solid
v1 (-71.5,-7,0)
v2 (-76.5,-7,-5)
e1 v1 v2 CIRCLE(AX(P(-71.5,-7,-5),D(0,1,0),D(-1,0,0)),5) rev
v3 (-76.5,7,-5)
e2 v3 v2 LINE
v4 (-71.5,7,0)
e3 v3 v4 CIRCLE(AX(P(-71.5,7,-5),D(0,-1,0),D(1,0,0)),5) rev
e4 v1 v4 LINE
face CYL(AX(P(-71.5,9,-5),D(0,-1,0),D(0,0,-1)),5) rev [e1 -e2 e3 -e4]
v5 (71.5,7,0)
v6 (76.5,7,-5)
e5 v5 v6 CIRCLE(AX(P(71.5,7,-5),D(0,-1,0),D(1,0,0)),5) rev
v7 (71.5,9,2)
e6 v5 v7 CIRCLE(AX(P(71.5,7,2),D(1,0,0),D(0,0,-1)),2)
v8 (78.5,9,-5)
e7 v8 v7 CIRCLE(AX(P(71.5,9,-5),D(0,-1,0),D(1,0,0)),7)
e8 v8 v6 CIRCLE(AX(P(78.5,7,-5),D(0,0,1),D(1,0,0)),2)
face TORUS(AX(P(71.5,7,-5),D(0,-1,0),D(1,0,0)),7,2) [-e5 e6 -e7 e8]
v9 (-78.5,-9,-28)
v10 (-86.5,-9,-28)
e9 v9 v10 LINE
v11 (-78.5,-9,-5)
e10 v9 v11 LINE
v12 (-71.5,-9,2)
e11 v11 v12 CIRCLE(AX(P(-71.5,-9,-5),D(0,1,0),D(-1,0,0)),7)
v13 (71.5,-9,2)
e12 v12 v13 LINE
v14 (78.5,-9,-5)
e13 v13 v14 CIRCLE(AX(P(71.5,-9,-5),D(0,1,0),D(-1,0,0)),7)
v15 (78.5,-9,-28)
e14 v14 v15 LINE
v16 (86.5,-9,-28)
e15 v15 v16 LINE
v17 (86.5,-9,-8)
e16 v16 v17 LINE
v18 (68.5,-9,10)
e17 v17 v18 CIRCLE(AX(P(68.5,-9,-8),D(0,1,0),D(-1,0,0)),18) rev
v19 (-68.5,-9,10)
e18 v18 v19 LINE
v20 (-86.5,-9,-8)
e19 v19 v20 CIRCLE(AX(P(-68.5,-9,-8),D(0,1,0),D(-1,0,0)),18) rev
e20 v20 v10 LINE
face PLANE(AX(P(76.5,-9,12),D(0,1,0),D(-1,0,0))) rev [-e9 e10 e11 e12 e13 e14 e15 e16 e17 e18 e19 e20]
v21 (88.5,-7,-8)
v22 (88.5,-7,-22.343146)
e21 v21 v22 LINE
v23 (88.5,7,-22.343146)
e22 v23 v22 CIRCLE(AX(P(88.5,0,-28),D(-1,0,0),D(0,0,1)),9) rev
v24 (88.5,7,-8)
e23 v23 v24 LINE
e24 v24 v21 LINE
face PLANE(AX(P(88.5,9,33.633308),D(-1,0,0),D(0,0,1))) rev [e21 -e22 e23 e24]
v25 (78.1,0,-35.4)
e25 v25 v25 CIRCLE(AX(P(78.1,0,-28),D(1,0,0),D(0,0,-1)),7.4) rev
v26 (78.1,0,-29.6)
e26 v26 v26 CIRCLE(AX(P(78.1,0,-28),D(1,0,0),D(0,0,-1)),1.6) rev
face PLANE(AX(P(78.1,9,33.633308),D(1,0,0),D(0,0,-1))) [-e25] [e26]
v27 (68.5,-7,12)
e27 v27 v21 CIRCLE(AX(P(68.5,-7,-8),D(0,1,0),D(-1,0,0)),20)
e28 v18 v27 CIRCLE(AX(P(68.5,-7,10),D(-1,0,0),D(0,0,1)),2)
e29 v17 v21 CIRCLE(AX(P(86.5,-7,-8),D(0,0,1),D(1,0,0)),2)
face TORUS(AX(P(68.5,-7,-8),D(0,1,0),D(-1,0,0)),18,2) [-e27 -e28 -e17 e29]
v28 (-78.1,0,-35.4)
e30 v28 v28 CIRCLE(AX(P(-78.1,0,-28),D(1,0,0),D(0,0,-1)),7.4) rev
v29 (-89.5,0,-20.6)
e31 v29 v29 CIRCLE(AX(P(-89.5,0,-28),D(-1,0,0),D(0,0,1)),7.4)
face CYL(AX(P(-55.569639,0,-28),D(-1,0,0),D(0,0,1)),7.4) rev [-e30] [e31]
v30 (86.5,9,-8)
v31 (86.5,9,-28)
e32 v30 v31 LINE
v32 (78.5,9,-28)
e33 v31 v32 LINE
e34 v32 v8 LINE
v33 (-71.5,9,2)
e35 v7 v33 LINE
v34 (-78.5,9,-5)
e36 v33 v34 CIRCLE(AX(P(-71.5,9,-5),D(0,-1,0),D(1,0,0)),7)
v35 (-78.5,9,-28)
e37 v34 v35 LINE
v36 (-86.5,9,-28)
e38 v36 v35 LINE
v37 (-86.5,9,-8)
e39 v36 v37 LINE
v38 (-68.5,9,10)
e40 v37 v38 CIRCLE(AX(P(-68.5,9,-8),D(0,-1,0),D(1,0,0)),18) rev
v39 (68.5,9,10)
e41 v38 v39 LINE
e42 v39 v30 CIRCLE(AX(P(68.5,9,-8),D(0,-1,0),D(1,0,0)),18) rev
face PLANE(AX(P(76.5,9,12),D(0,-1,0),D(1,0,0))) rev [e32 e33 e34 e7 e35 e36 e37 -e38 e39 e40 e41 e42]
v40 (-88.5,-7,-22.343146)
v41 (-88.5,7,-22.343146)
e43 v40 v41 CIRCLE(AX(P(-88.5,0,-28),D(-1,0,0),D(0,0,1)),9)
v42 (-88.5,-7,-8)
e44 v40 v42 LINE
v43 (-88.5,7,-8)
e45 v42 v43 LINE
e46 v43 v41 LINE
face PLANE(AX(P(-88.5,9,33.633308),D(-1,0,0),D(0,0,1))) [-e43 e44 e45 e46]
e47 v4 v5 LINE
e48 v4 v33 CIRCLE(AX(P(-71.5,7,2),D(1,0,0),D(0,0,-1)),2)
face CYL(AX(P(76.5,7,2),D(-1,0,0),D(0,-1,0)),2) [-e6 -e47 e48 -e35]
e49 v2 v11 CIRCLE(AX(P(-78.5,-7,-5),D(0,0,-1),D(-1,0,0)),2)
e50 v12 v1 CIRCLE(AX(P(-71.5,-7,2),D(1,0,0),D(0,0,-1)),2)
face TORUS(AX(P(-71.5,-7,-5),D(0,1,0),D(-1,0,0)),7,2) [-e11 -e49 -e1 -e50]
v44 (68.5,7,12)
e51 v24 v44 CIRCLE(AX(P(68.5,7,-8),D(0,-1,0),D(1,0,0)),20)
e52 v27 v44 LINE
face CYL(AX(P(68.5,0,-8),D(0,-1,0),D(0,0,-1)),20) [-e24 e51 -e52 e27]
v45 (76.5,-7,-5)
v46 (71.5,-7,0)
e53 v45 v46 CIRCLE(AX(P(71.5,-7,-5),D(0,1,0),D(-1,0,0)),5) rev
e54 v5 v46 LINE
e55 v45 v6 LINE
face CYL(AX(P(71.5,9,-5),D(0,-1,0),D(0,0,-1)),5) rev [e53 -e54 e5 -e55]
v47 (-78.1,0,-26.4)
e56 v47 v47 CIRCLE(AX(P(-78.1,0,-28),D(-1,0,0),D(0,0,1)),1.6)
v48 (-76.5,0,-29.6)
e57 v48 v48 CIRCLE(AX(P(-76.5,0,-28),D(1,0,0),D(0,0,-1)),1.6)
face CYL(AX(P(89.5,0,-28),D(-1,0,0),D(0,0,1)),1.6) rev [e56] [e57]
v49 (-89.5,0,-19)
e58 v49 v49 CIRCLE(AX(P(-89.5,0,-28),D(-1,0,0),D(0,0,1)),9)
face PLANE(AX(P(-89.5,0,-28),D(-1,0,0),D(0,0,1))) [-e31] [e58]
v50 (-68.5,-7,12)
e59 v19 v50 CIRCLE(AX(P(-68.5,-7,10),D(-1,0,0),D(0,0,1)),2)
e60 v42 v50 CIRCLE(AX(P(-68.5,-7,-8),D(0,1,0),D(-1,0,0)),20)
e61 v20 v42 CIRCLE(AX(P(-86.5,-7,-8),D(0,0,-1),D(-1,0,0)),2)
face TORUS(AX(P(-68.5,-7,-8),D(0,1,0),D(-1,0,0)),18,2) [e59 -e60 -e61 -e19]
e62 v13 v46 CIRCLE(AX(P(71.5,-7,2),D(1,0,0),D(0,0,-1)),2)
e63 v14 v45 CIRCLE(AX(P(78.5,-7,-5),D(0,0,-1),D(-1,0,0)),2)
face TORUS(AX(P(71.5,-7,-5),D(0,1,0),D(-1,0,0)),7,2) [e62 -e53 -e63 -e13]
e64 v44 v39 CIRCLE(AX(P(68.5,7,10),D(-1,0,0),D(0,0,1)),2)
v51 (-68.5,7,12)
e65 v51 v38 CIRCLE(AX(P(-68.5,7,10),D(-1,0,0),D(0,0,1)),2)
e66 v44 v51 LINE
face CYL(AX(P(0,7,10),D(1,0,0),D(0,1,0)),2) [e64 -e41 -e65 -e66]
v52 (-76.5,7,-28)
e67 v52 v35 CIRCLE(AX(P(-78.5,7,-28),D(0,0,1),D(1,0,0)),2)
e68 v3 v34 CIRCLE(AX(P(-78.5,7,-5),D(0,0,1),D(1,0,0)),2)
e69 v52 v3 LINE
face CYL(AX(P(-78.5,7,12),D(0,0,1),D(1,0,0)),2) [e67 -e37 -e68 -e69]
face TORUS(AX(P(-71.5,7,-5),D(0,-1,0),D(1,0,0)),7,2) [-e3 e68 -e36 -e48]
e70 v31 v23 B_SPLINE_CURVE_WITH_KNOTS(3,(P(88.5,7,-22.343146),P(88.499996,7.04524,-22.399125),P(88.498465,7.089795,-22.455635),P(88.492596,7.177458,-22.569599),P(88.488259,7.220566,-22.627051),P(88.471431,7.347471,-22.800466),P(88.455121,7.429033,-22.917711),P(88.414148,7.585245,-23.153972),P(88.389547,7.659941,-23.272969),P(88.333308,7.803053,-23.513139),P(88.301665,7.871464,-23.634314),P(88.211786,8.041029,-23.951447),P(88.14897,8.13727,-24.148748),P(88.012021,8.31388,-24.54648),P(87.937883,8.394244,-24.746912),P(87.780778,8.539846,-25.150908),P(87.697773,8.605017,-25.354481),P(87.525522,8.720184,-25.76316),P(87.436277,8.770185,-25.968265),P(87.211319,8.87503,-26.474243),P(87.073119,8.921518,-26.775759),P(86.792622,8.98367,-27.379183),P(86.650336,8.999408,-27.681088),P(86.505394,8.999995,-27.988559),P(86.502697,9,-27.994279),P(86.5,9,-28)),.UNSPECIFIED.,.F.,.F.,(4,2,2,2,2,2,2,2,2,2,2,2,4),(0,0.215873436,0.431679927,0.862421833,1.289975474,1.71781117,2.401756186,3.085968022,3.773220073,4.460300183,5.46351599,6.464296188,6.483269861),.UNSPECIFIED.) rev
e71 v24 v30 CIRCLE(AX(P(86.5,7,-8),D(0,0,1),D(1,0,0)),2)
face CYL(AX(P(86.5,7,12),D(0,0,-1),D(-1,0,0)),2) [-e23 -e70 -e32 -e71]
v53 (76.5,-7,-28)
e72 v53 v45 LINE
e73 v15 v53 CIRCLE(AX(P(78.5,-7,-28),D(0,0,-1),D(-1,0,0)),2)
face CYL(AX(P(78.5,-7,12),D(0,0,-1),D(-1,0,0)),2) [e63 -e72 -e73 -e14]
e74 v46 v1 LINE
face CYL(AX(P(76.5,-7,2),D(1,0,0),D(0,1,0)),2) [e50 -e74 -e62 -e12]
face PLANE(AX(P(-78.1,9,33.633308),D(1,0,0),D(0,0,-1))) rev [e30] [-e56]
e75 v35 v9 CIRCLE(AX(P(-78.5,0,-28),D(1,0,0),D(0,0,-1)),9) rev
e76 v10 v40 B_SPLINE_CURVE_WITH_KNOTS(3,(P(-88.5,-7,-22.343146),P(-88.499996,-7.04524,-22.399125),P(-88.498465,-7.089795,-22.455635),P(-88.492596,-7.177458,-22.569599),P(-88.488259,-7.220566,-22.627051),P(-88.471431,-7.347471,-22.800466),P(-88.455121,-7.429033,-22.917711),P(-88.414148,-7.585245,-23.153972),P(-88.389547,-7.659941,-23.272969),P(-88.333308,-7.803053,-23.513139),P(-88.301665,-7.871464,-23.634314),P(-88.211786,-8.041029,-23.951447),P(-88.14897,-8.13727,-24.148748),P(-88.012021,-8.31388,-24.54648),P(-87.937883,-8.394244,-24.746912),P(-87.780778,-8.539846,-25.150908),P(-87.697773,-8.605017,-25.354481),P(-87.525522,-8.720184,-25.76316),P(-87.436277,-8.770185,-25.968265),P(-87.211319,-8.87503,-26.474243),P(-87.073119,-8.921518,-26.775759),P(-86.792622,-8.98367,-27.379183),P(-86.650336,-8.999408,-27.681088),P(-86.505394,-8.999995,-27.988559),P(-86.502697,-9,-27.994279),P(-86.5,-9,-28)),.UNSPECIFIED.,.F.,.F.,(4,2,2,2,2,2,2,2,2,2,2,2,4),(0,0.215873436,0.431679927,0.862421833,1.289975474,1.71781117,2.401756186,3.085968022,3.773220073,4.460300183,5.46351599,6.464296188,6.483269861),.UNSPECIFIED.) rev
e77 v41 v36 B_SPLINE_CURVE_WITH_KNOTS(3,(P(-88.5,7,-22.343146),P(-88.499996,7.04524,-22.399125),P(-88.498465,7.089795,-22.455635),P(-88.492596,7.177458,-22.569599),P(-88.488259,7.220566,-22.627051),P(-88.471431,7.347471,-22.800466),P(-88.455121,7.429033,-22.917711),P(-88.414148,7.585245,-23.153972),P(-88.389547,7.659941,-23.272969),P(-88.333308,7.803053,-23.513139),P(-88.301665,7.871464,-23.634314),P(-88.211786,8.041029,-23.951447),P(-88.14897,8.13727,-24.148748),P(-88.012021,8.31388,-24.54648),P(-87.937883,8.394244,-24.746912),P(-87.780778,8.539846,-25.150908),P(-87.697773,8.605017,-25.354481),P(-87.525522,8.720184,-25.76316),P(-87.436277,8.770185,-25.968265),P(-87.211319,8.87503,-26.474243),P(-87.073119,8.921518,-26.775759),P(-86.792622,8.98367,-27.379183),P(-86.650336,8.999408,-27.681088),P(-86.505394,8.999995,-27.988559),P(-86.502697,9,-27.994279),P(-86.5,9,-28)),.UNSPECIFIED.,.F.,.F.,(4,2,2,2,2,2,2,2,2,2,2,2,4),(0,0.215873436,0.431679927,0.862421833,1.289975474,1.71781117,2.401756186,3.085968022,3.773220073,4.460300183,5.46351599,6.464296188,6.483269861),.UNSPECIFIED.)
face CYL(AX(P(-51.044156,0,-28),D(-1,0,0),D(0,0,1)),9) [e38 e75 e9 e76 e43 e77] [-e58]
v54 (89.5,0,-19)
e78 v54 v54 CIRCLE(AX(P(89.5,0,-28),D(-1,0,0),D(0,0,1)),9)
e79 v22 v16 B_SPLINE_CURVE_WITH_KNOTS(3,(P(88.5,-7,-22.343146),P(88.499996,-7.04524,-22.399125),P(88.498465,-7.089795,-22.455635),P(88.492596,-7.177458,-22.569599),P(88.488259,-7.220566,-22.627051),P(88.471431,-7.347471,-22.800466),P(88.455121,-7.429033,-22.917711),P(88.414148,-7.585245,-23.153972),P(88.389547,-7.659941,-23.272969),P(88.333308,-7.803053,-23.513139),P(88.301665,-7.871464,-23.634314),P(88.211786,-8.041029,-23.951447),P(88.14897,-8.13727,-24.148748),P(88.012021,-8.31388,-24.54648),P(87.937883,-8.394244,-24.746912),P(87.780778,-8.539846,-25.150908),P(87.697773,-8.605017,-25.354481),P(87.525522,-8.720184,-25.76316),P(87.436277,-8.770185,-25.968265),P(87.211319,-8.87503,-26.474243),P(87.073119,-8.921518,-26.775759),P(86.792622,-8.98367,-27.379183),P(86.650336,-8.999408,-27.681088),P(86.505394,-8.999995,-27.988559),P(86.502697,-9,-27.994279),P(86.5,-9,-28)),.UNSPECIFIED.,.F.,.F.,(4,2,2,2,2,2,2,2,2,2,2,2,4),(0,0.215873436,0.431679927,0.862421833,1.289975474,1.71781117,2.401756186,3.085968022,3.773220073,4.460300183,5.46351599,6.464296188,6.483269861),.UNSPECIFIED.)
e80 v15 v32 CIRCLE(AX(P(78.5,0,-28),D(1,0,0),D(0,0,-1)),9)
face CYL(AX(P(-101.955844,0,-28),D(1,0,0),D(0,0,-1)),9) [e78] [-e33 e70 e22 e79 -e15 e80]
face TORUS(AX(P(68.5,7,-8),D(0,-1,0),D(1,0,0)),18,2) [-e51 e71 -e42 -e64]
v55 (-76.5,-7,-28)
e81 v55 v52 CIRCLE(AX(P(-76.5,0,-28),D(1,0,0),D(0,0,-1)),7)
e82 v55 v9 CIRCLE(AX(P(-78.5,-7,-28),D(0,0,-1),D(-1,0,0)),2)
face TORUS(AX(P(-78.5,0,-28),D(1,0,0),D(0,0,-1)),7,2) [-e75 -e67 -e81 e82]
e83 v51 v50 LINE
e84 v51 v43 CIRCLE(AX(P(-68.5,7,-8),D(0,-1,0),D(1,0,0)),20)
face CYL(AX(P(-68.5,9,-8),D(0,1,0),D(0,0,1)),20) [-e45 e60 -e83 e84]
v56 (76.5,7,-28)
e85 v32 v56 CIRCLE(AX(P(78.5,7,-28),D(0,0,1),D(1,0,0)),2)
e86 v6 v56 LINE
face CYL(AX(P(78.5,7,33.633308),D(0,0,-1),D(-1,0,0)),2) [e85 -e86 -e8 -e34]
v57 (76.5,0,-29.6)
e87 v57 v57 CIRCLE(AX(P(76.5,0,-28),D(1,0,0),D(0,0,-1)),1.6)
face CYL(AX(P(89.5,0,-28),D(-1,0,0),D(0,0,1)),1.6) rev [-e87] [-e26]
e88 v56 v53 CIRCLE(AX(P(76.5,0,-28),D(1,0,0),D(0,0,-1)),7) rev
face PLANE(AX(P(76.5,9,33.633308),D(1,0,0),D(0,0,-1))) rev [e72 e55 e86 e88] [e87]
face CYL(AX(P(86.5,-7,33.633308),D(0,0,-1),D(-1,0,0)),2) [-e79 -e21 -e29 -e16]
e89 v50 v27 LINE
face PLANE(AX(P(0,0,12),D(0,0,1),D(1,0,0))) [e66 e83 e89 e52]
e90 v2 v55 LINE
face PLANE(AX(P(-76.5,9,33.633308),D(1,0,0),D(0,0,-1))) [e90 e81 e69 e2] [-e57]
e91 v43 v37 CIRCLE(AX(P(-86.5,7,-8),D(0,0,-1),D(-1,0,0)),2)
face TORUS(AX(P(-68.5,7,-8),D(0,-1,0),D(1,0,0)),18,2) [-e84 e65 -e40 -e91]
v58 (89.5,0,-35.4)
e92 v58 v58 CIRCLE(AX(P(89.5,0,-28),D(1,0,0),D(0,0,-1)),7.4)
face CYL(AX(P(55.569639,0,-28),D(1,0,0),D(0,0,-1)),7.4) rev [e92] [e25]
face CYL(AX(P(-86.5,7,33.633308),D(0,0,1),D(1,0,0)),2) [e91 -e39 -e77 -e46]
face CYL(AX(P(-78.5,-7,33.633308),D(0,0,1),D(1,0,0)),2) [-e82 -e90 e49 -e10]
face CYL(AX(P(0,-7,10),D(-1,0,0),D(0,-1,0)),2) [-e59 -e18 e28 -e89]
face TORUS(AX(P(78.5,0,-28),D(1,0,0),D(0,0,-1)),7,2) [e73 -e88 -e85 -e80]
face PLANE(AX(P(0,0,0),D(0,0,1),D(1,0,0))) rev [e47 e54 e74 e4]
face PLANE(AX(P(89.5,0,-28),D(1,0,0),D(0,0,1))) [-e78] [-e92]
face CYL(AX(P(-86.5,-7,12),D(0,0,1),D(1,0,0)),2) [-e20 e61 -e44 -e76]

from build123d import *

# Parameters (mm, degrees)
SKETCH1_W           = 153
SKETCH1_H           = 18
BOSS_EXTRUDE1_DEPTH = 12
BOSS_EXTRUDE2_START = -12
SKETCH2_W           = 12
SKETCH2_H           = 18
BOSS_EXTRUDE2_DEPTH = 40
BOSS_EXTRUDE3_START = -12
SKETCH3_R           = 9
BOSS_EXTRUDE3_DEPTH = 13
SKETCH4_R           = 7.4
CUT_EXTRUDE1_DEPTH  = 11.4
SKETCH5_R           = 1.6
CUT_EXTRUDE2_DEPTH  = 172.871347234
CUT_EXTRUDE4_START  = -11.4
SKETCH9_R           = 7.4
CUT_EXTRUDE4_DEPTH  = 11.4
FILLET1_R           = 20
FILLET2_R           = 5
FILLET3_R           = 2


with BuildPart() as part:
    # Sketch1 → Boss-Extrude1 (new body)
    with BuildSketch(Plane.XY):
        Rectangle(SKETCH1_W, SKETCH1_H)
    extrude(amount=BOSS_EXTRUDE1_DEPTH)

    # Sketch2 → Boss-Extrude2 (add)
    with BuildSketch(Plane(origin=(0, 0, 0), x_dir=(-1, 0, 0), z_dir=(0, 0, -1)).offset(BOSS_EXTRUDE2_START)):
        with Locations((82.5, 0)):
            Rectangle(SKETCH2_W, SKETCH2_H)
    boss_extrude2 = extrude(amount=BOSS_EXTRUDE2_DEPTH)

    # Sketch3 → Boss-Extrude3 (add)
    with BuildSketch(Plane.ZY.offset(88.5).offset(BOSS_EXTRUDE3_START)):
        with Locations((-28, 0)):
            Circle(SKETCH3_R)
    boss_extrude3 = extrude(amount=BOSS_EXTRUDE3_DEPTH)

    # Mirror1: Boss-Extrude2, Boss-Extrude3 across plane
    add(boss_extrude2.mirror(Plane(origin=(0, 0, 0), x_dir=(0, 0, 1), z_dir=(1, 0, 0))))
    add(boss_extrude3.mirror(Plane(origin=(0, 0, 0), x_dir=(0, 0, 1), z_dir=(1, 0, 0))))

    # Sketch4 → Cut-Extrude1 (cut)
    with BuildSketch(Plane.ZY.offset(89.5)):
        with Locations((-28, 0)):
            Circle(SKETCH4_R)
    extrude(amount=-CUT_EXTRUDE1_DEPTH, mode=Mode.SUBTRACT)

    # Sketch5 → Cut-Extrude2 (cut, through all)
    with BuildSketch(Plane.ZY.offset(78.1)):
        with Locations((-28, 0)):
            Circle(SKETCH5_R)
    extrude(amount=-CUT_EXTRUDE2_DEPTH, mode=Mode.SUBTRACT)

    # Sketch9 → Cut-Extrude4 (cut)
    with BuildSketch(Plane(origin=(89.5, 0, 0), x_dir=(0, 0, -1), z_dir=(1, 0, 0)).offset(CUT_EXTRUDE4_START)):
        with Locations(Location((28, 0, 0), (0, 0, 180))):
            Circle(SKETCH9_R)
    extrude(amount=CUT_EXTRUDE4_DEPTH, mode=Mode.SUBTRACT)

    # Fillet1
    fillet1_edges = [part.edges().sort_by_distance(p)[0] for p in [
        (-88.5, 0, 12),
        (88.5, 0, 12),
    ]]
    fillet(fillet1_edges, radius=FILLET1_R)

    # Fillet2
    fillet2_edges = [part.edges().sort_by_distance(p)[0] for p in [
        (76.5, 0, 0),
        (-76.5, 0, 0),
    ]]
    fillet(fillet2_edges, radius=FILLET2_R)

    # Fillet3
    # the kernel refuses this fillet: 2 mm, written as the material it takes off along each edge
    with BuildSketch(Plane(origin=(-76.5, 0, -28), x_dir=(0, 1, 0), z_dir=(0, 0, 1))) as fillet3_piece_1:
        with BuildLine():
            CenterArc((9 - FILLET3_R, FILLET3_R), FILLET3_R, 270, 90)
            Line((9, FILLET3_R), (9, 0))
            Line((9, 0), (9 - FILLET3_R, 0))
        make_face()
    revolve(axis=Axis((-76.5, 0, -28), (-1, 0, 0)), revolution_arc=180, mode=Mode.SUBTRACT)
    with BuildSketch(Plane(origin=(76.5, 0, -28), x_dir=(0, 1, 0), z_dir=(0, 0, 1))) as fillet3_piece_2:
        with BuildLine():
            CenterArc((9 - FILLET3_R, -FILLET3_R), FILLET3_R, 0, 90)
            Line((9, -FILLET3_R), (9, 0))
            Line((9, 0), (9 - FILLET3_R, 0))
        make_face()
    revolve(axis=Axis((76.5, 0, -28), (-1, 0, 0)), revolution_arc=180, mode=Mode.SUBTRACT)
    with BuildSketch(Plane(origin=(68.5, 9, 12), x_dir=(0, -1, 0), z_dir=(-1, 0, 0)), Plane(origin=(68.5, -9, 12), x_dir=(0, 0, -1), z_dir=(-1, 0, 0))) as fillet3_piece_3:
        with BuildLine():
            CenterArc((FILLET3_R, -FILLET3_R), FILLET3_R, 90, 90)
            Line((0, -FILLET3_R), (0, 0))
            Line((0, 0), (FILLET3_R, 0))
        make_face()
    extrude(amount=137, mode=Mode.SUBTRACT)
    with BuildSketch(Plane(origin=(-88.5, 9, -8), x_dir=(0, -1, 0), z_dir=(0, 0, -1))) as fillet3_piece_4_section:
        with BuildLine():
            CenterArc((FILLET3_R, -FILLET3_R), FILLET3_R, 90, 90)
            Line((0, -FILLET3_R), (0, 0))
            Line((0, 0), (FILLET3_R, 0))
        make_face()
    fillet3_piece_4 = extrude(amount=25, mode=Mode.PRIVATE)
    fillet3_piece_4 = fillet3_piece_4 - Plane(origin=(-88.080537714, 0, -28), x_dir=(0, 0, 1), z_dir=(1, 0, 0)) * Cylinder(9, 59, mode=Mode.PRIVATE)
    add(fillet3_piece_4, mode=Mode.SUBTRACT)
    with BuildSketch(Plane(origin=(88.5, 9, -8), x_dir=(0, -1, 0), z_dir=(0, 0, -1))) as fillet3_piece_5_section:
        with BuildLine():
            CenterArc((FILLET3_R, FILLET3_R), FILLET3_R, 180, 90)
            Line((0, FILLET3_R), (0, 0))
            Line((0, 0), (FILLET3_R, 0))
        make_face()
    fillet3_piece_5 = extrude(amount=25, mode=Mode.PRIVATE)
    fillet3_piece_5 = fillet3_piece_5 - Plane(origin=(88.080537714, 0, -28), x_dir=(0, 0, 1), z_dir=(-1, 0, 0)) * Cylinder(9, 59, mode=Mode.PRIVATE)
    add(fillet3_piece_5, mode=Mode.SUBTRACT)
    with BuildSketch(Plane(origin=(-68.5, 9, -8), x_dir=(-1, 0, 0), z_dir=(0, 0, -1))) as fillet3_piece_6:
        with BuildLine():
            CenterArc((20 - FILLET3_R, -FILLET3_R), FILLET3_R, 0, 90)
            Line((20 - FILLET3_R, 0), (20, 0))
            Line((20, 0), (20, -FILLET3_R))
        make_face()
    revolve(axis=Axis((-68.5, 9, -8), (0, 1, 0)), revolution_arc=90, mode=Mode.SUBTRACT)
    with BuildSketch(Plane(origin=(68.5, 9, -8), x_dir=(1, 0, 0), z_dir=(0, 0, -1))) as fillet3_piece_7:
        with BuildLine():
            CenterArc((20 - FILLET3_R, FILLET3_R), FILLET3_R, 270, 90)
            Line((20 - FILLET3_R, 0), (20, 0))
            Line((20, 0), (20, FILLET3_R))
        make_face()
    revolve(axis=Axis((68.5, 9, -8), (0, -1, 0)), revolution_arc=90, mode=Mode.SUBTRACT)
    with BuildSketch(Plane(origin=(88.5, -9, -8), x_dir=(-1, 0, 0), z_dir=(0, 0, -1))) as fillet3_piece_8_section:
        with BuildLine():
            CenterArc((FILLET3_R, FILLET3_R), FILLET3_R, 180, 90)
            Line((0, FILLET3_R), (0, 0))
            Line((0, 0), (FILLET3_R, 0))
        make_face()
    fillet3_piece_8 = extrude(amount=25, mode=Mode.PRIVATE)
    fillet3_piece_8 = fillet3_piece_8 - Plane(origin=(87.881585808, 0, -28), x_dir=(0, 0, 1), z_dir=(-1, 0, 0)) * Cylinder(9, 59, mode=Mode.PRIVATE)
    add(fillet3_piece_8, mode=Mode.SUBTRACT)
    with BuildSketch(Plane(origin=(-88.5, -9, -8), x_dir=(1, 0, 0), z_dir=(0, 0, -1))) as fillet3_piece_9_section:
        with BuildLine():
            CenterArc((FILLET3_R, -FILLET3_R), FILLET3_R, 90, 90)
            Line((0, -FILLET3_R), (0, 0))
            Line((0, 0), (FILLET3_R, 0))
        make_face()
    fillet3_piece_9 = extrude(amount=25, mode=Mode.PRIVATE)
    fillet3_piece_9 = fillet3_piece_9 - Plane(origin=(-87.881599188, 0, -28), x_dir=(0, 0, 1), z_dir=(1, 0, 0)) * Cylinder(9, 59, mode=Mode.PRIVATE)
    add(fillet3_piece_9, mode=Mode.SUBTRACT)
    with BuildSketch(Plane(origin=(-68.5, -9, -8), x_dir=(-1, 0, 0), z_dir=(0, 0, -1))) as fillet3_piece_10:
        with BuildLine():
            CenterArc((20 - FILLET3_R, FILLET3_R), FILLET3_R, 270, 90)
            Line((20, FILLET3_R), (20, 0))
            Line((20, 0), (20 - FILLET3_R, 0))
        make_face()
    revolve(axis=Axis((-68.5, -9, -8), (0, 1, 0)), revolution_arc=90, mode=Mode.SUBTRACT)
    with BuildSketch(Plane(origin=(68.5, -9, -8), x_dir=(1, 0, 0), z_dir=(0, 0, -1))) as fillet3_piece_11:
        with BuildLine():
            CenterArc((20 - FILLET3_R, -FILLET3_R), FILLET3_R, 0, 90)
            Line((20, -FILLET3_R), (20, 0))
            Line((20, 0), (20 - FILLET3_R, 0))
        make_face()
    revolve(axis=Axis((68.5, -9, -8), (0, -1, 0)), revolution_arc=90, mode=Mode.SUBTRACT)
    with BuildSketch(Plane(origin=(-76.5, -9, -5), x_dir=(-1, 0, 0), z_dir=(0, 0, -1)), Plane(origin=(-76.5, 9, -5), x_dir=(0, -1, 0), z_dir=(0, 0, -1))) as fillet3_piece_12:
        with BuildLine():
            CenterArc((FILLET3_R, FILLET3_R), FILLET3_R, 180, 90)
            Line((0, FILLET3_R), (0, 0))
            Line((0, 0), (FILLET3_R, 0))
        make_face()
    extrude(amount=23, mode=Mode.SUBTRACT)
    with BuildSketch(Plane(origin=(-71.5, 9, 0), x_dir=(0, -1, 0), z_dir=(1, 0, 0))) as fillet3_piece_13:
        with BuildLine():
            CenterArc((FILLET3_R, -FILLET3_R), FILLET3_R, 90, 90)
            Line((0, -FILLET3_R), (0, 0))
            Line((0, 0), (FILLET3_R, 0))
        make_face()
    extrude(amount=143, mode=Mode.SUBTRACT)
    with BuildSketch(Plane(origin=(71.5, -9, 0), x_dir=(0, 0, 1), z_dir=(-1, 0, 0))) as fillet3_piece_14:
        with BuildLine():
            CenterArc((FILLET3_R, FILLET3_R), FILLET3_R, 180, 90)
            Line((0, FILLET3_R), (0, 0))
            Line((0, 0), (FILLET3_R, 0))
        make_face()
    extrude(amount=143, mode=Mode.SUBTRACT)
    with BuildSketch(Plane(origin=(76.5, 9, -5), x_dir=(0, -1, 0), z_dir=(0, 0, -1)), Plane(origin=(76.5, -9, -5), x_dir=(1, 0, 0), z_dir=(0, 0, -1))) as fillet3_piece_15:
        with BuildLine():
            CenterArc((FILLET3_R, -FILLET3_R), FILLET3_R, 90, 90)
            Line((0, -FILLET3_R), (0, 0))
            Line((0, 0), (FILLET3_R, 0))
        make_face()
    extrude(amount=23, mode=Mode.SUBTRACT)
    with BuildSketch(Plane(origin=(-71.5, -9, -5), x_dir=(-1, 0, 0), z_dir=(0, 0, -1))) as fillet3_piece_16:
        with BuildLine():
            CenterArc((5 + FILLET3_R, FILLET3_R), FILLET3_R, 180, 90)
            Line((5, FILLET3_R), (5, 0))
            Line((5, 0), (5 + FILLET3_R, 0))
        make_face()
    revolve(axis=Axis((-71.5, -9, -5), (0, 1, 0)), revolution_arc=90, mode=Mode.SUBTRACT)
    with BuildSketch(Plane(origin=(-71.5, 9, -5), x_dir=(-1, 0, 0), z_dir=(0, 0, -1))) as fillet3_piece_17:
        with BuildLine():
            CenterArc((5 + FILLET3_R, -FILLET3_R), FILLET3_R, 90, 90)
            Line((5 + FILLET3_R, 0), (5, 0))
            Line((5, 0), (5, -FILLET3_R))
        make_face()
    revolve(axis=Axis((-71.5, 9, -5), (0, 1, 0)), revolution_arc=90, mode=Mode.SUBTRACT)
    with BuildSketch(Plane(origin=(71.5, 9, -5), x_dir=(0, 0, 1), z_dir=(-1, 0, 0))) as fillet3_piece_18:
        with BuildLine():
            CenterArc((5 + FILLET3_R, -FILLET3_R), FILLET3_R, 90, 90)
            Line((5 + FILLET3_R, 0), (5, 0))
            Line((5, 0), (5, -FILLET3_R))
        make_face()
    revolve(axis=Axis((71.5, 9, -5), (0, 1, 0)), revolution_arc=90, mode=Mode.SUBTRACT)
    with BuildSketch(Plane(origin=(71.5, -9, -5), x_dir=(0, 0, 1), z_dir=(-1, 0, 0))) as fillet3_piece_19:
        with BuildLine():
            CenterArc((5 + FILLET3_R, FILLET3_R), FILLET3_R, 180, 90)
            Line((5, FILLET3_R), (5, 0))
            Line((5, 0), (5 + FILLET3_R, 0))
        make_face()
    revolve(axis=Axis((71.5, -9, -5), (0, 1, 0)), revolution_arc=90, mode=Mode.SUBTRACT)


solid = part.part
